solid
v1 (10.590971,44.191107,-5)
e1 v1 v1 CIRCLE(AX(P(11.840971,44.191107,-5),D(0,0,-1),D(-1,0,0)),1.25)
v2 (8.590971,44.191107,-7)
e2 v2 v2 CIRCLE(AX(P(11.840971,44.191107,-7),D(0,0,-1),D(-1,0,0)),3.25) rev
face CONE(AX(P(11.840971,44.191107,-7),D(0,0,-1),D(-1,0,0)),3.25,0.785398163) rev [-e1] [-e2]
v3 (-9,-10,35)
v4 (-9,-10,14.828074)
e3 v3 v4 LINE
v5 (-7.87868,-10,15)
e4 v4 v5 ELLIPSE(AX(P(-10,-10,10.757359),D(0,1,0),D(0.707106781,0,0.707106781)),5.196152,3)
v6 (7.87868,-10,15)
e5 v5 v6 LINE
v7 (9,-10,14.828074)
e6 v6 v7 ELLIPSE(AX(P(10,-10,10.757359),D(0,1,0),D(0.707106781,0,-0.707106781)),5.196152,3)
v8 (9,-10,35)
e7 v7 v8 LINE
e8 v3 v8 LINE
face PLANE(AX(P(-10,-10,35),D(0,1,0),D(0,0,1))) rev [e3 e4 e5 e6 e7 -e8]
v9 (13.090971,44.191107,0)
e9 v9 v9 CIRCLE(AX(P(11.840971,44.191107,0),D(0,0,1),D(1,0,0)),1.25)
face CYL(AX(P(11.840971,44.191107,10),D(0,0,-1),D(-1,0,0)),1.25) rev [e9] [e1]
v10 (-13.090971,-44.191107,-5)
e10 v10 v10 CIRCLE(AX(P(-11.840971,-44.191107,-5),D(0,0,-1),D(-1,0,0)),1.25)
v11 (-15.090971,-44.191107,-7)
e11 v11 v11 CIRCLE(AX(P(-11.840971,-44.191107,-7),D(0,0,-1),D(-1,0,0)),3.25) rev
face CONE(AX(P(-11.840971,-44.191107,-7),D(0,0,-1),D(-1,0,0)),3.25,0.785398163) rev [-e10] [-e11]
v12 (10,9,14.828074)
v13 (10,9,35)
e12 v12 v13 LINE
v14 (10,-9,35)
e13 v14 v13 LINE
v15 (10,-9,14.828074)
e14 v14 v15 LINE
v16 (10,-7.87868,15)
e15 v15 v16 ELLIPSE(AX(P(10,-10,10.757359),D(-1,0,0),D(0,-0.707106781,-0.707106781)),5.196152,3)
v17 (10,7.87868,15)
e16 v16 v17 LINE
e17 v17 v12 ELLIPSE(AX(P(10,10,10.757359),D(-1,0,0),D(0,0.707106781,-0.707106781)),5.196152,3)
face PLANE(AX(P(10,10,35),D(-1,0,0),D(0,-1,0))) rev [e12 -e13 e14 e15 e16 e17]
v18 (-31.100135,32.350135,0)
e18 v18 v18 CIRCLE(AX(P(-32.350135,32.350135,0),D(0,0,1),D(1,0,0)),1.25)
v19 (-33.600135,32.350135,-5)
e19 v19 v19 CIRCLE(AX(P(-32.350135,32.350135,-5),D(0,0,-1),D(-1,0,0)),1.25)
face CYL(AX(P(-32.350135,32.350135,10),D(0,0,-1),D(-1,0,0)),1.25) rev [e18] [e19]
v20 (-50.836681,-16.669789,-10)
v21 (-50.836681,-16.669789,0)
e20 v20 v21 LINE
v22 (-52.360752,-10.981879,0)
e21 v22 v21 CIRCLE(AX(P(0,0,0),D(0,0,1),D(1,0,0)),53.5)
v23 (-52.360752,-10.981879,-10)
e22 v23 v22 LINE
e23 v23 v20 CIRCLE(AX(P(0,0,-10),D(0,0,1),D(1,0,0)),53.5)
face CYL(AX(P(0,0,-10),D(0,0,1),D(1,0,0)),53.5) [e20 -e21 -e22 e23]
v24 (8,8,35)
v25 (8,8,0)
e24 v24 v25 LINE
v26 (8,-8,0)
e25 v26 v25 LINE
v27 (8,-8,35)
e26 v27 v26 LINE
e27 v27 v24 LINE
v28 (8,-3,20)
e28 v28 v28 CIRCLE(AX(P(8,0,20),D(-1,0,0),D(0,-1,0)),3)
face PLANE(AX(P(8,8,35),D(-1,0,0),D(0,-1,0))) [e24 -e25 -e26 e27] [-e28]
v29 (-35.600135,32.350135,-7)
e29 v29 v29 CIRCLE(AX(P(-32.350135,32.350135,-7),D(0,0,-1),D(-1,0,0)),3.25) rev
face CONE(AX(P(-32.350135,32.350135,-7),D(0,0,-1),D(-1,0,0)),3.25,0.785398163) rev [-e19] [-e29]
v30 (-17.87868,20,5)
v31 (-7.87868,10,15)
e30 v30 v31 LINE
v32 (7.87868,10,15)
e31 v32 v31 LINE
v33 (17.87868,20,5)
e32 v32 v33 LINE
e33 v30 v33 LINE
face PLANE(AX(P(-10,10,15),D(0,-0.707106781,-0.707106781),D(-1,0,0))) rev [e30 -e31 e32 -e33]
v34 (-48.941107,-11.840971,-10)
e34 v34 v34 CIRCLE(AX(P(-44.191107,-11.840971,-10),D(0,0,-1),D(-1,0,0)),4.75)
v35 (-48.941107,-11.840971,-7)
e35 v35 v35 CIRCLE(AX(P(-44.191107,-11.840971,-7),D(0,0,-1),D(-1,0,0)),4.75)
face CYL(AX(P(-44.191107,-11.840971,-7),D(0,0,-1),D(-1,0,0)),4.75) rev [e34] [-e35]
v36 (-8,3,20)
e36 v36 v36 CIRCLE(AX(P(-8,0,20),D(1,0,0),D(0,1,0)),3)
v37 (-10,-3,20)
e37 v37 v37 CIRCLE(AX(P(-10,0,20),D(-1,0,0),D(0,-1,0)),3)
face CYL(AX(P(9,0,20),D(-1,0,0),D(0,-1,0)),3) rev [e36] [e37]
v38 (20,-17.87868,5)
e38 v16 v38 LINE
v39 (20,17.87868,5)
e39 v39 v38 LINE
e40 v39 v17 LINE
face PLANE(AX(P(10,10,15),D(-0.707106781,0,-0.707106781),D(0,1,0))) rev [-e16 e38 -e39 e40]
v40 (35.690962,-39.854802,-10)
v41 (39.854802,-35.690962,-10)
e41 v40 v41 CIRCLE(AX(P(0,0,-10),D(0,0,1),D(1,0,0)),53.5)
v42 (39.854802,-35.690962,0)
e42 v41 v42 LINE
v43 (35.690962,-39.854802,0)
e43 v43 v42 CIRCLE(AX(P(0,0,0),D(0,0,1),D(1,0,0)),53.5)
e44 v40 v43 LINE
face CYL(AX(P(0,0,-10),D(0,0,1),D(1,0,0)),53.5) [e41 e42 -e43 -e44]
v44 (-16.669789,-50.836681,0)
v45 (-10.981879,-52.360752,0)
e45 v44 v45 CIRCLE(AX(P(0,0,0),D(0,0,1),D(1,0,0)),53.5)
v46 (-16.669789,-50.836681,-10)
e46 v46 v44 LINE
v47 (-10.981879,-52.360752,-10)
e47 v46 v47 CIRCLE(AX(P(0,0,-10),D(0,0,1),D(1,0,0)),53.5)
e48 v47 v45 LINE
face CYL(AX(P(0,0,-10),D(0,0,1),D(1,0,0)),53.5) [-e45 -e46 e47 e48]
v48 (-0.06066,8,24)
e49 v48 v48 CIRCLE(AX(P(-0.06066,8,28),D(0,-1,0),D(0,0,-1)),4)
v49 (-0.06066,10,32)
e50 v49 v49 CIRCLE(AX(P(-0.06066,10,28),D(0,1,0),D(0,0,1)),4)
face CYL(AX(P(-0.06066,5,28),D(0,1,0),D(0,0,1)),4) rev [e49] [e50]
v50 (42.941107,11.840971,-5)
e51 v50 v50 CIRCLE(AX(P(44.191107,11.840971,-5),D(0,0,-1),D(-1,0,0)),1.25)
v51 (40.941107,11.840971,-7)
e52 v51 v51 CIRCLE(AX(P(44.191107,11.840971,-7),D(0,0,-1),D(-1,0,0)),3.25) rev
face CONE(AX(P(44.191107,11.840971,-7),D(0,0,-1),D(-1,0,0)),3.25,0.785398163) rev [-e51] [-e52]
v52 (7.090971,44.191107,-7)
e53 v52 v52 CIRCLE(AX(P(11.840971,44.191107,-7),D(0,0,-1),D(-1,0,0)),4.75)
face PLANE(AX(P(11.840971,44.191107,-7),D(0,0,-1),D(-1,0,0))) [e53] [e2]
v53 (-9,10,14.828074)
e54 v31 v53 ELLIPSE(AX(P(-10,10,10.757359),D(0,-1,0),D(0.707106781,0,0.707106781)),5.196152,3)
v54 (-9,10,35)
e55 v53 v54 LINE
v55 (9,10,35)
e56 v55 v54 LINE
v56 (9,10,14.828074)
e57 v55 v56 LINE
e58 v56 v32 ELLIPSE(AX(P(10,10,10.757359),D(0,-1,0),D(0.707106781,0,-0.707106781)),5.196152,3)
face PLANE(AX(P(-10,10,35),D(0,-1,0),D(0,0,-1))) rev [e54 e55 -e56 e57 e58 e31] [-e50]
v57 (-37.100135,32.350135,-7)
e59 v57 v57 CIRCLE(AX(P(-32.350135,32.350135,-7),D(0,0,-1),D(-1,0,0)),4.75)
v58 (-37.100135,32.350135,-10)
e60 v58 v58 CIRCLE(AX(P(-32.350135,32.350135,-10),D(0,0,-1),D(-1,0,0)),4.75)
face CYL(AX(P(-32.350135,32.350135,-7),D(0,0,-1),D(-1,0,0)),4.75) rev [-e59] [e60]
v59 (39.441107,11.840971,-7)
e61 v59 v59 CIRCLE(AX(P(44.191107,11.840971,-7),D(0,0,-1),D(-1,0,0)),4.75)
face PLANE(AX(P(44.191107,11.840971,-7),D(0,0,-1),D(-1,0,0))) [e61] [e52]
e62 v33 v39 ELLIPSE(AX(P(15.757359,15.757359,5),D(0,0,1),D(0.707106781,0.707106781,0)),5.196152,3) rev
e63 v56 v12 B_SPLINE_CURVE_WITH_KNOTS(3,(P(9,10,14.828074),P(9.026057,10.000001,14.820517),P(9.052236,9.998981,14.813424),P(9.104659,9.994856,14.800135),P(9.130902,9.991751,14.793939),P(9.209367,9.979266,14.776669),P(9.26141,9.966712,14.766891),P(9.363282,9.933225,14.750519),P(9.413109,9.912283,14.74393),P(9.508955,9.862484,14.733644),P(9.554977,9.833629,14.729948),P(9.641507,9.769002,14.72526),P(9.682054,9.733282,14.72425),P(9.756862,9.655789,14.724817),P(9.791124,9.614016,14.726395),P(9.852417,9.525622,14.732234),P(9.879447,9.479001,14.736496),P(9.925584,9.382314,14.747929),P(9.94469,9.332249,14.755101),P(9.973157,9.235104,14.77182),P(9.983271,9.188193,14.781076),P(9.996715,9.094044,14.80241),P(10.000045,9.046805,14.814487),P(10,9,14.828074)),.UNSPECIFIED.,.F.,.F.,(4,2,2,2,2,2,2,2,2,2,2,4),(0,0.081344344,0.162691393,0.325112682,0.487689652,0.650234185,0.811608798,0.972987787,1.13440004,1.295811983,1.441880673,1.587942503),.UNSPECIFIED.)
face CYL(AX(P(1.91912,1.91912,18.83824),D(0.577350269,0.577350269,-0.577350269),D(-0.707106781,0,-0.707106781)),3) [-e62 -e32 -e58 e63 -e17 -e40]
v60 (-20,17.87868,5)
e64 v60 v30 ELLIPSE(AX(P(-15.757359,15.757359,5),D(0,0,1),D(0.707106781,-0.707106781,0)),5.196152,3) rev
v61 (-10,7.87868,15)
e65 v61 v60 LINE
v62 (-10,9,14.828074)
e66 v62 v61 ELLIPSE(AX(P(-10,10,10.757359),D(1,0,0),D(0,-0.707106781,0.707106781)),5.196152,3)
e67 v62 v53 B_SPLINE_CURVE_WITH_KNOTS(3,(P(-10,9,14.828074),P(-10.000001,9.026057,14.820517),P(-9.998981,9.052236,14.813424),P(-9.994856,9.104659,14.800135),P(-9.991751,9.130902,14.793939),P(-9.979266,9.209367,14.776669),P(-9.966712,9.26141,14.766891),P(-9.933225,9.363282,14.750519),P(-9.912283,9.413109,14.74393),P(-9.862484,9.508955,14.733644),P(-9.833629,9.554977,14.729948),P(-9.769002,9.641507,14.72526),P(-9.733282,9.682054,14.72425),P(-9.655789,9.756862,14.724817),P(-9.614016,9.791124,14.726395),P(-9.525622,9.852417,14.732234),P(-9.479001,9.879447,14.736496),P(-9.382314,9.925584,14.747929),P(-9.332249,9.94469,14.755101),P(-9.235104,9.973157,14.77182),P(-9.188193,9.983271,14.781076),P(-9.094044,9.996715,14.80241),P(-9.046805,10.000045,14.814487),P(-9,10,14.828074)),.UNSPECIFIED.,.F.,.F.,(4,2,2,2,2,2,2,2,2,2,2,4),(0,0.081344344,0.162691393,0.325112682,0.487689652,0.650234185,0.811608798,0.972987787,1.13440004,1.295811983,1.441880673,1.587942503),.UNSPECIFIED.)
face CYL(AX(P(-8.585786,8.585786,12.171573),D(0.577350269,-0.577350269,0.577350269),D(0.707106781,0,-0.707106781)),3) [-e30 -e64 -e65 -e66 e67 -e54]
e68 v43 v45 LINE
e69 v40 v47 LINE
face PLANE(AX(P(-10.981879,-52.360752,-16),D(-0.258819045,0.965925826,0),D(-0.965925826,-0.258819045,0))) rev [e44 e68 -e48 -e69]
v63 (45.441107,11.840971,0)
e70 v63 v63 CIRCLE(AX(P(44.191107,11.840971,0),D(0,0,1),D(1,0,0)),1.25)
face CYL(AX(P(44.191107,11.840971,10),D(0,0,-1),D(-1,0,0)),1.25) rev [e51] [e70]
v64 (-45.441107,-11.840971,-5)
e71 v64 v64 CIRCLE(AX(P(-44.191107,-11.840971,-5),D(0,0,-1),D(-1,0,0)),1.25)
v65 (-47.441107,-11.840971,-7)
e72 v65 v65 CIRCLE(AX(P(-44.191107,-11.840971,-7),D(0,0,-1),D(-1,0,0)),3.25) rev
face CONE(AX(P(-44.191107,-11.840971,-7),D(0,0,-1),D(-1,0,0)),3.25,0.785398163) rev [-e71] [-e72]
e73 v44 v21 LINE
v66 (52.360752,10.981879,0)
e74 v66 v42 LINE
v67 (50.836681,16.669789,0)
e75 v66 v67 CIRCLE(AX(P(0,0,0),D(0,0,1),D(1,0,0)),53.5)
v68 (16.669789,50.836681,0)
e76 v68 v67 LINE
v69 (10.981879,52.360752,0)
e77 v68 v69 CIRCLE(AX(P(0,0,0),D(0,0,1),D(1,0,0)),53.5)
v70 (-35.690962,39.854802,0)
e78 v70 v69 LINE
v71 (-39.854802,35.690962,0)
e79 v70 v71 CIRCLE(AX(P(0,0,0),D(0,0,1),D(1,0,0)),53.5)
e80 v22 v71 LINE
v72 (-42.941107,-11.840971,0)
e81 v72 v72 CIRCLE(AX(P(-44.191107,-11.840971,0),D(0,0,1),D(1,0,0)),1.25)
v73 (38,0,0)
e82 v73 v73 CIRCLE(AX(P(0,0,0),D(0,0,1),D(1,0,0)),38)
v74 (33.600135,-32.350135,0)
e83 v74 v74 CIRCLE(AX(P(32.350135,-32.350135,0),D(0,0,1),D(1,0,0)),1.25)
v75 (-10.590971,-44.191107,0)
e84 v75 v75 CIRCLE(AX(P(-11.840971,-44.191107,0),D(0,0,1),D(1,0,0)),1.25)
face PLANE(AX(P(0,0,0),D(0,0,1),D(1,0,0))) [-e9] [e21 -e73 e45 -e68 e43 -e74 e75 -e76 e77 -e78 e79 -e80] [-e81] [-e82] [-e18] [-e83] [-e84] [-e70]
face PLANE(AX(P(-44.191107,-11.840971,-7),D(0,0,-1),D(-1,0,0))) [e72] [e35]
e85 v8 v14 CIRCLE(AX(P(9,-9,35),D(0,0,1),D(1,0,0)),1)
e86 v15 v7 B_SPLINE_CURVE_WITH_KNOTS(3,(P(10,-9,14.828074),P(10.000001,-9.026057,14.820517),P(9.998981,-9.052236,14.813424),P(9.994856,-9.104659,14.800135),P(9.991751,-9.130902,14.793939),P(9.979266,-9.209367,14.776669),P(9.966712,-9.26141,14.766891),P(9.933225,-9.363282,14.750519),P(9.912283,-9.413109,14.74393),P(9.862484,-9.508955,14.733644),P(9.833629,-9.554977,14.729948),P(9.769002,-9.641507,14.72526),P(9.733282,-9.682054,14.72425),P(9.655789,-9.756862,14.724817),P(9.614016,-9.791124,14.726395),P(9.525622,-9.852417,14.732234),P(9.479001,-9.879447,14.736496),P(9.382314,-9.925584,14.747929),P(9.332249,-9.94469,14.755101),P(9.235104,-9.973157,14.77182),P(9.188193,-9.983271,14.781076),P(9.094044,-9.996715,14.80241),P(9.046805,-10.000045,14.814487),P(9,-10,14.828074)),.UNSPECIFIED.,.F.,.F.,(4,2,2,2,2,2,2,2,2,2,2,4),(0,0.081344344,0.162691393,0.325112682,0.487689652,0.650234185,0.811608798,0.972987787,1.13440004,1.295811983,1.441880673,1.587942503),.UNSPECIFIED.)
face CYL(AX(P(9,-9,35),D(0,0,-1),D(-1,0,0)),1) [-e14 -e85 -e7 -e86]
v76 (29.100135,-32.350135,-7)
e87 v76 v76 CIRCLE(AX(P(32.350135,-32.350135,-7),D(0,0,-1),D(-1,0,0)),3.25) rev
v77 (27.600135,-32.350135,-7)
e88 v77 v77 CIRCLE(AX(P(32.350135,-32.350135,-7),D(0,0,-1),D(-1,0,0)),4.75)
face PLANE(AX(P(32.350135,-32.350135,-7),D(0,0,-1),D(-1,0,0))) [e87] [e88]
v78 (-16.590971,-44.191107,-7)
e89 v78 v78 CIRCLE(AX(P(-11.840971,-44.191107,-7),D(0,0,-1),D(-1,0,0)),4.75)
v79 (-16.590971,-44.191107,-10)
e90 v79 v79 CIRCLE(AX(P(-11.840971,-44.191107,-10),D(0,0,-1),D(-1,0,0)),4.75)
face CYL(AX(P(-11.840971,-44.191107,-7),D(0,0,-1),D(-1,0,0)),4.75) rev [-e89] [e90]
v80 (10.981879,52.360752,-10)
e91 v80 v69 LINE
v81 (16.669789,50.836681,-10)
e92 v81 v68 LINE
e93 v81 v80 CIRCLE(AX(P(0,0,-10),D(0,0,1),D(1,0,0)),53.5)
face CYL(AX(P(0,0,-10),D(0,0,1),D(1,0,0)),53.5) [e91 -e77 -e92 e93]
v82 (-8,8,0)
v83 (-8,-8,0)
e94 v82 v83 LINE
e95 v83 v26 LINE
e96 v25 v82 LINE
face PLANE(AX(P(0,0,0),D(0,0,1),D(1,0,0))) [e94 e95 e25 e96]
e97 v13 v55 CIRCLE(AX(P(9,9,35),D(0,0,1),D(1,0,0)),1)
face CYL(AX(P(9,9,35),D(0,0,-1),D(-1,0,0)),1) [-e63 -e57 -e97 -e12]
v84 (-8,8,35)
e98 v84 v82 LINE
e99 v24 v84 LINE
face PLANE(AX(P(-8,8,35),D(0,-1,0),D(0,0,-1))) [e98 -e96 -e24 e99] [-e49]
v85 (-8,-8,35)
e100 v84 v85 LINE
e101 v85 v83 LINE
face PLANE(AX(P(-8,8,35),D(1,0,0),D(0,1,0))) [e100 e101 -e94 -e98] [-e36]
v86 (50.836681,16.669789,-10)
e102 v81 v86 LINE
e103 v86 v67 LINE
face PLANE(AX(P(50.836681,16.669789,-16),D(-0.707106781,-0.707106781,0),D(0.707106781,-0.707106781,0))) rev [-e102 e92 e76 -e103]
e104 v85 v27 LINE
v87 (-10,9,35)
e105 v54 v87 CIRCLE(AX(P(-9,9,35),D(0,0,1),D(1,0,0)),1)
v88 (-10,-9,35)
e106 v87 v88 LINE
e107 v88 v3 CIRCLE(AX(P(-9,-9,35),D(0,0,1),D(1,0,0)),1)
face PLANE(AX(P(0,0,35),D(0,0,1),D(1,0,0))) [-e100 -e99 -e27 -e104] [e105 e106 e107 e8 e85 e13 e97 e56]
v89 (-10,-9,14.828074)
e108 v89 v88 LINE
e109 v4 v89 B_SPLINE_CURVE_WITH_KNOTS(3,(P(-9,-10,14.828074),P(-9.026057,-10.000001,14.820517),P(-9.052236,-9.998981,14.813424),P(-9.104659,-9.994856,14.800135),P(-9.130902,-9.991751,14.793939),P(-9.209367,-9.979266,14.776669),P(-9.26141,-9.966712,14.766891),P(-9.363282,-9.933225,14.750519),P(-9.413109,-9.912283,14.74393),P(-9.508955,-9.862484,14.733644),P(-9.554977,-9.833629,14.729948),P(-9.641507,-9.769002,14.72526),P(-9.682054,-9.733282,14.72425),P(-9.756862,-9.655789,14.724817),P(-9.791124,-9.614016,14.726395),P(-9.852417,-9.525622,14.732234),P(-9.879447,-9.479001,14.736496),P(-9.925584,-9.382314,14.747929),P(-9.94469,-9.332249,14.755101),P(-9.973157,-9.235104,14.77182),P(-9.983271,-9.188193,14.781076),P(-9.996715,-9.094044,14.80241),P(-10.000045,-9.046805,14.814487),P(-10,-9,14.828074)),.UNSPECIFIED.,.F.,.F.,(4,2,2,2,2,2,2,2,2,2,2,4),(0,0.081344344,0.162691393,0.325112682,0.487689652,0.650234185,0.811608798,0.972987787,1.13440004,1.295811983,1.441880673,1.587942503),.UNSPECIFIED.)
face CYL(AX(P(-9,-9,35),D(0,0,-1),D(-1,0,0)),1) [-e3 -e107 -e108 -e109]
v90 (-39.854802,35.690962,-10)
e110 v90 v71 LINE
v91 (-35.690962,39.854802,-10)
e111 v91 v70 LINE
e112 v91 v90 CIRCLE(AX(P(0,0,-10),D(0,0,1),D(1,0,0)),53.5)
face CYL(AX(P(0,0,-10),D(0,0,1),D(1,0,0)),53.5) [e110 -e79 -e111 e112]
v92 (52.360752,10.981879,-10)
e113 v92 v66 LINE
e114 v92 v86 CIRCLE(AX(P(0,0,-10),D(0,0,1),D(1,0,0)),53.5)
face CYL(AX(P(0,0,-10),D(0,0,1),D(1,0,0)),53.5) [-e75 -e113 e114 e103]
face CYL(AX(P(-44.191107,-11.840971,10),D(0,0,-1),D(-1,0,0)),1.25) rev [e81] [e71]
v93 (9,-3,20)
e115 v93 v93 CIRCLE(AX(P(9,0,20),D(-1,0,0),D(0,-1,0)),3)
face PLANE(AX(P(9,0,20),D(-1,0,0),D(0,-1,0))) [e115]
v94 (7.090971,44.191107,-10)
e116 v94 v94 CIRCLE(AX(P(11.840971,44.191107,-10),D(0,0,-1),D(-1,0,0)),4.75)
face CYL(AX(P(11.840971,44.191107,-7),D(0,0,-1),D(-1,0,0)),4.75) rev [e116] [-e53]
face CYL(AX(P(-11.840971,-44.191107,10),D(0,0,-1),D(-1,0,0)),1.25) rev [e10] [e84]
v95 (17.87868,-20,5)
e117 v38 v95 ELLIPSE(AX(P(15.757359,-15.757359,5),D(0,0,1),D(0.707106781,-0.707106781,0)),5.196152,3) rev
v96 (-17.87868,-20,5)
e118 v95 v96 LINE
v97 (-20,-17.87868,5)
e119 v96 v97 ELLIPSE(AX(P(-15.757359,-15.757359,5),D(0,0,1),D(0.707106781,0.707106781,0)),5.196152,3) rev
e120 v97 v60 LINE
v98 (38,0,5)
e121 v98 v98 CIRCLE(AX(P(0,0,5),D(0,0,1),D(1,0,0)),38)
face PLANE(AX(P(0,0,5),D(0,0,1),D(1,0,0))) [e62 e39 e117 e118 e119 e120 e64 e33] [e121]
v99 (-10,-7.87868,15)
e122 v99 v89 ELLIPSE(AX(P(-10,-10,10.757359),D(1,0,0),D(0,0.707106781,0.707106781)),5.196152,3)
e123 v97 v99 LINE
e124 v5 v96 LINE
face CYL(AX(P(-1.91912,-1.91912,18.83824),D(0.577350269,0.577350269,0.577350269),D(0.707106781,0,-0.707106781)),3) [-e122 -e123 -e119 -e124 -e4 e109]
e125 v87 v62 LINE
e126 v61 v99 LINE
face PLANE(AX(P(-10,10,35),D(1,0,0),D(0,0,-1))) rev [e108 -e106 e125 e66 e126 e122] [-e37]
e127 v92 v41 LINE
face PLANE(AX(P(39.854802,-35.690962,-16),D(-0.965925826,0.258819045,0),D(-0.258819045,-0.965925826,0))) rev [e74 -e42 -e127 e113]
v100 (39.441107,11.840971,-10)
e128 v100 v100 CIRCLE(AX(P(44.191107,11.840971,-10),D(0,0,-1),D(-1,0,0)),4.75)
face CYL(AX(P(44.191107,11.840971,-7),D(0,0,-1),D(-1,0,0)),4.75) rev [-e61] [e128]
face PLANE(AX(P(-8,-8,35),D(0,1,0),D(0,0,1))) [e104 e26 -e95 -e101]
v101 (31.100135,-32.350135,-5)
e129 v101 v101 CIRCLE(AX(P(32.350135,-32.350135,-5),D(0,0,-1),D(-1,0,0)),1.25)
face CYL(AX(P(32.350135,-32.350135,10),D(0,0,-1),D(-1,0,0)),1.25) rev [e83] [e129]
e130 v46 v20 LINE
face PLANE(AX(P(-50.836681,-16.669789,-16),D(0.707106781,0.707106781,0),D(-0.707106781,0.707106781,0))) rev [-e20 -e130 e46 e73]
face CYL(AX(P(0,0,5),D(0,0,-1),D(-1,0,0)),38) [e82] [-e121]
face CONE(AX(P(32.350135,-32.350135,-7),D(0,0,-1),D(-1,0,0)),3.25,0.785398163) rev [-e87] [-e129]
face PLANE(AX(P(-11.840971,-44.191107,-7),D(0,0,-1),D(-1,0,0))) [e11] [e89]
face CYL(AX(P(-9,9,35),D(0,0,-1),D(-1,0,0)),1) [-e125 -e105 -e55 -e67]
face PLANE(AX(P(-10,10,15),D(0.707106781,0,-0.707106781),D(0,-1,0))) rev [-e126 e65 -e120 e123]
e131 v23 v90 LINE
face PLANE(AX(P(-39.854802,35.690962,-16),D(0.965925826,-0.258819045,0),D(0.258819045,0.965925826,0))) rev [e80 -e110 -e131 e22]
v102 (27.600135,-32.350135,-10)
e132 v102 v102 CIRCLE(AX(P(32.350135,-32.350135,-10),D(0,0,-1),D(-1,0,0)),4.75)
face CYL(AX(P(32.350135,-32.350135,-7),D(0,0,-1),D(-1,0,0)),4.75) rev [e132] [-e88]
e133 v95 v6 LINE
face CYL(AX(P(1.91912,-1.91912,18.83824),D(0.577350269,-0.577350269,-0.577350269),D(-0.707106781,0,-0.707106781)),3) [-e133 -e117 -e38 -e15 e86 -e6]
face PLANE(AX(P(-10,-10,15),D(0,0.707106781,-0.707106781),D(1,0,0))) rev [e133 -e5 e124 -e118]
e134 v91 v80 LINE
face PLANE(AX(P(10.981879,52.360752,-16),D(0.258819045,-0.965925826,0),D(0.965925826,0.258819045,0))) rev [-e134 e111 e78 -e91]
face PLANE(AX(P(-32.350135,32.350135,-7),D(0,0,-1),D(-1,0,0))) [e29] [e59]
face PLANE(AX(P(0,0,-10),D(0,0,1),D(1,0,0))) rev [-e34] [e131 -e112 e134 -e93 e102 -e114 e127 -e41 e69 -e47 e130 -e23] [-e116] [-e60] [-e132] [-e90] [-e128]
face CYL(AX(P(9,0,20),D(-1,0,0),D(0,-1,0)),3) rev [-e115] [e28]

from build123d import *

# Parameters (mm, degrees)
SKETCH_1_R          = 53.5
EXTRUDE_1_DEPTH     = 10
SKETCH_2_R          = 38
EXTRUDE_2_DEPTH     = 5
SKETCH_3_W          = 20
SKETCH_3_H          = 20
SKETCH_3_W_2        = 16
SKETCH_3_H_2        = 16
EXTRUDE_3_DEPTH     = 30
SKETCH_4_R          = 3
CUT_EXTRUDE_1_DEPTH = 19
CHAMFER_1_SIZE      = 10
FILLET_1_R          = 3
FILLET_2_R          = 1
SKETCH_6_W          = 16
SKETCH_6_H          = 16
CUT_EXTRUDE_2_DEPTH = 35
CUT_EXTRUDE_3_DEPTH = 16
SKETCH_8_R          = 1.25
CUT_EXTRUDE_4_DEPTH = 20
SKETCH_9_R          = 4.75
CUT_EXTRUDE_5_DEPTH = 3
SKETCH_10_R         = 4
CUT_EXTRUDE_6_DEPTH = 5


with BuildPart() as part:
    # Эскиз1 → Бобышка-Вытянуть1 (new body)
    with BuildSketch(Plane.XY):
        Circle(SKETCH_1_R)
    extrude(amount=-EXTRUDE_1_DEPTH)

    # Эскиз2 → Бобышка-Вытянуть2 (add)
    with BuildSketch(Plane.XY):
        Circle(SKETCH_2_R)
    extrude(amount=EXTRUDE_2_DEPTH)

    # Эскиз3 → Бобышка-Вытянуть3 (add)
    with BuildSketch(Plane.XY.offset(5)):
        Rectangle(SKETCH_3_W, SKETCH_3_H)
        Rectangle(SKETCH_3_W_2, SKETCH_3_H_2, mode=Mode.SUBTRACT)
    extrude(amount=EXTRUDE_3_DEPTH)

    # Эскиз4 → Вырез-Вытянуть1 (cut)
    with BuildSketch(Plane.ZY.offset(10)):
        with Locations(Location((20, 0, 0), (0, 0, 270))):
            Circle(SKETCH_4_R)
    extrude(amount=-CUT_EXTRUDE_1_DEPTH, mode=Mode.SUBTRACT)

    # Фаска1
    chamfer_1_edges = [part.edges().sort_by_distance(p)[0] for p in [
        (10, 0, 5),
        (0, 10, 5),
        (-10, 0, 5),
        (0, -10, 5),
    ]]
    chamfer(chamfer_1_edges, length=CHAMFER_1_SIZE)

    # Скругление1
    fillet_1_edges = [part.edges().sort_by_distance(p)[0] for p in [
        (15, -15, 10),
        (-15, -15, 10),
        (15, 15, 10),
        (-15, 15, 10),
    ]]
    fillet(fillet_1_edges, radius=FILLET_1_R)

    # Fillet 2
    fillet_2_edges = [part.edges().sort_by_distance(p)[0] for p in [
        (-10, -10, 24.715796964),
        (-10, 10, 24.715796964),
        (10, 10, 24.715796964),
        (10, -10, 24.715796964),
    ]]
    fillet(fillet_2_edges, radius=FILLET_2_R)

    # Эскиз6 → Вырез-Вытянуть2 (cut)
    with BuildSketch(Plane.XY.offset(35)):
        Rectangle(SKETCH_6_W, SKETCH_6_H)
    extrude(amount=-CUT_EXTRUDE_2_DEPTH, mode=Mode.SUBTRACT)

    # Эскиз7 → Вырез-Вытянуть3 (cut)
    with BuildSketch(Plane.XY):
        with BuildLine():
            Line((-50.83668087, -16.669789385), (-16.669789385, -50.83668087))
            ThreePointArc((-16.669789385, -50.83668087), (-37.830212793, -37.830212793), (-50.83668087, -16.669789385))
        make_face()
        with BuildLine():
            Line((-39.854801518, 35.690962385), (-52.36075177, -10.981879352))
            ThreePointArc((-52.36075177, -10.981879352), (-51.677031706, 13.846818913), (-39.854801518, 35.690962385))
        make_face()
        with BuildLine():
            Line((10.981879352, 52.36075177), (-35.690962385, 39.854801518))
            ThreePointArc((-35.690962385, 39.854801518), (-13.846818913, 51.677031706), (10.981879352, 52.36075177))
        make_face()
        with BuildLine():
            Line((50.83668087, 16.669789385), (16.669789385, 50.83668087))
            ThreePointArc((16.669789385, 50.83668087), (37.830212793, 37.830212793), (50.83668087, 16.669789385))
        make_face()
        with BuildLine():
            Line((39.854801518, -35.690962385), (52.36075177, 10.981879352))
            ThreePointArc((52.36075177, 10.981879352), (51.677031706, -13.846818913), (39.854801518, -35.690962385))
        make_face()
        with BuildLine():
            Line((-10.981879352, -52.36075177), (35.690962385, -39.854801518))
            ThreePointArc((35.690962385, -39.854801518), (13.846818913, -51.677031706), (-10.981879352, -52.36075177))
        make_face()
    extrude(amount=-CUT_EXTRUDE_3_DEPTH, mode=Mode.SUBTRACT)

    # Эскиз8 → Вырез-Вытянуть4 (cut)
    with BuildSketch(Plane(origin=(0, 0, -10), x_dir=(-1, 0, 0), z_dir=(0, 0, -1))):
        with Locations((32.350135239, 32.350135239)):
            Circle(SKETCH_8_R)
        with Locations((44.191106553, -11.840971313)):
            Circle(SKETCH_8_R)
        with Locations((11.840971313, -44.191106553)):
            Circle(SKETCH_8_R)
        with Locations((-32.350135239, -32.350135239)):
            Circle(SKETCH_8_R)
        with Locations((-44.191106553, 11.840971313)):
            Circle(SKETCH_8_R)
        with Locations((-11.840971313, 44.191106553)):
            Circle(SKETCH_8_R)
    extrude(amount=-CUT_EXTRUDE_4_DEPTH, mode=Mode.SUBTRACT)

    # Эскиз9 → Вырез-Вытянуть5 (cut)
    with BuildSketch(Plane(origin=(0, 0, -10), x_dir=(-1, 0, 0), z_dir=(0, 0, -1))):
        with Locations((-11.840971313, 44.191106553)):
            Circle(SKETCH_9_R)
        with Locations((-44.191106553, 11.840971313)):
            Circle(SKETCH_9_R)
        with Locations((-32.350135239, -32.350135239)):
            Circle(SKETCH_9_R)
        with Locations((11.840971313, -44.191106553)):
            Circle(SKETCH_9_R)
        with Locations((44.191106553, -11.840971313)):
            Circle(SKETCH_9_R)
        with Locations((32.350135239, 32.350135239)):
            Circle(SKETCH_9_R)
    extrude(amount=-CUT_EXTRUDE_5_DEPTH, mode=Mode.SUBTRACT)

    # Fillet 2 2: read off the stored shape, not the designer's step
    # Fillet 2 2 outline → Fillet 2 2 (revolve, cut)
    with BuildSketch(Plane(origin=(-11.840971313, -44.191106553, 0), x_dir=(1, 0, 0), z_dir=(0, -1, 0))):
        Polygon((3.25, -7), (1.25, -5), (1.25, -7), align=None)
    revolve(axis=Axis((-11.840971313, -44.191106553, 0), (0, 0, 1)), mode=Mode.SUBTRACT)

    # Фаска3: read off the stored shape, not the designer's step
    # Фаска3 outline → Фаска3 (revolve, cut)
    with BuildSketch(Plane(origin=(32.350135239, -32.350135239, 0), x_dir=(1, 0, 0), z_dir=(0, -1, 0))):
        Polygon((3.25, -7), (1.25, -5), (1.25, -7), align=None)
    revolve(axis=Axis((32.350135239, -32.350135239, 0), (0, 0, 1)), mode=Mode.SUBTRACT)

    # Фаска4: read off the stored shape, not the designer's step
    # Фаска4 outline → Фаска4 (revolve, cut)
    with BuildSketch(Plane(origin=(44.191106553, 11.840971313, 0), x_dir=(1, 0, 0), z_dir=(0, -1, 0))):
        Polygon((3.25, -7), (1.25, -5), (1.25, -7), align=None)
    revolve(axis=Axis((44.191106553, 11.840971313, 0), (0, 0, 1)), mode=Mode.SUBTRACT)

    # Фаска5: read off the stored shape, not the designer's step
    # Фаска5 outline → Фаска5 (revolve, cut)
    with BuildSketch(Plane(origin=(11.840971313, 44.191106553, 0), x_dir=(1, 0, 0), z_dir=(0, -1, 0))):
        Polygon((3.25, -7), (1.25, -5), (1.25, -7), align=None)
    revolve(axis=Axis((11.840971313, 44.191106553, 0), (0, 0, 1)), mode=Mode.SUBTRACT)

    # Фаска6: read off the stored shape, not the designer's step
    # Фаска6 outline → Фаска6 (revolve, cut)
    with BuildSketch(Plane(origin=(-32.350135239, 32.350135239, 0), x_dir=(1, 0, 0), z_dir=(0, -1, 0))):
        Polygon((3.25, -7), (1.25, -5), (1.25, -7), align=None)
    revolve(axis=Axis((-32.350135239, 32.350135239, 0), (0, 0, 1)), mode=Mode.SUBTRACT)

    # Фаска7: read off the stored shape, not the designer's step
    # Фаска7 outline → Фаска7 (revolve, cut)
    with BuildSketch(Plane(origin=(-44.191106553, -11.840971313, 0), x_dir=(1, 0, 0), z_dir=(0, -1, 0))):
        Polygon((3.25, -7), (1.25, -5), (1.25, -7), align=None)
    revolve(axis=Axis((-44.191106553, -11.840971313, 0), (0, 0, 1)), mode=Mode.SUBTRACT)

    # Эскиз10 → Вырез-Вытянуть6 (cut)
    with BuildSketch(Plane(origin=(0, 10, 0), x_dir=(1, 0, 0), z_dir=(0, 1, 0))):
        with Locations(Location((-0.060660172, -28, 0), (0, 0, 270))):
            Circle(SKETCH_10_R)
    extrude(amount=-CUT_EXTRUDE_6_DEPTH, mode=Mode.SUBTRACT)


solid = part.part
